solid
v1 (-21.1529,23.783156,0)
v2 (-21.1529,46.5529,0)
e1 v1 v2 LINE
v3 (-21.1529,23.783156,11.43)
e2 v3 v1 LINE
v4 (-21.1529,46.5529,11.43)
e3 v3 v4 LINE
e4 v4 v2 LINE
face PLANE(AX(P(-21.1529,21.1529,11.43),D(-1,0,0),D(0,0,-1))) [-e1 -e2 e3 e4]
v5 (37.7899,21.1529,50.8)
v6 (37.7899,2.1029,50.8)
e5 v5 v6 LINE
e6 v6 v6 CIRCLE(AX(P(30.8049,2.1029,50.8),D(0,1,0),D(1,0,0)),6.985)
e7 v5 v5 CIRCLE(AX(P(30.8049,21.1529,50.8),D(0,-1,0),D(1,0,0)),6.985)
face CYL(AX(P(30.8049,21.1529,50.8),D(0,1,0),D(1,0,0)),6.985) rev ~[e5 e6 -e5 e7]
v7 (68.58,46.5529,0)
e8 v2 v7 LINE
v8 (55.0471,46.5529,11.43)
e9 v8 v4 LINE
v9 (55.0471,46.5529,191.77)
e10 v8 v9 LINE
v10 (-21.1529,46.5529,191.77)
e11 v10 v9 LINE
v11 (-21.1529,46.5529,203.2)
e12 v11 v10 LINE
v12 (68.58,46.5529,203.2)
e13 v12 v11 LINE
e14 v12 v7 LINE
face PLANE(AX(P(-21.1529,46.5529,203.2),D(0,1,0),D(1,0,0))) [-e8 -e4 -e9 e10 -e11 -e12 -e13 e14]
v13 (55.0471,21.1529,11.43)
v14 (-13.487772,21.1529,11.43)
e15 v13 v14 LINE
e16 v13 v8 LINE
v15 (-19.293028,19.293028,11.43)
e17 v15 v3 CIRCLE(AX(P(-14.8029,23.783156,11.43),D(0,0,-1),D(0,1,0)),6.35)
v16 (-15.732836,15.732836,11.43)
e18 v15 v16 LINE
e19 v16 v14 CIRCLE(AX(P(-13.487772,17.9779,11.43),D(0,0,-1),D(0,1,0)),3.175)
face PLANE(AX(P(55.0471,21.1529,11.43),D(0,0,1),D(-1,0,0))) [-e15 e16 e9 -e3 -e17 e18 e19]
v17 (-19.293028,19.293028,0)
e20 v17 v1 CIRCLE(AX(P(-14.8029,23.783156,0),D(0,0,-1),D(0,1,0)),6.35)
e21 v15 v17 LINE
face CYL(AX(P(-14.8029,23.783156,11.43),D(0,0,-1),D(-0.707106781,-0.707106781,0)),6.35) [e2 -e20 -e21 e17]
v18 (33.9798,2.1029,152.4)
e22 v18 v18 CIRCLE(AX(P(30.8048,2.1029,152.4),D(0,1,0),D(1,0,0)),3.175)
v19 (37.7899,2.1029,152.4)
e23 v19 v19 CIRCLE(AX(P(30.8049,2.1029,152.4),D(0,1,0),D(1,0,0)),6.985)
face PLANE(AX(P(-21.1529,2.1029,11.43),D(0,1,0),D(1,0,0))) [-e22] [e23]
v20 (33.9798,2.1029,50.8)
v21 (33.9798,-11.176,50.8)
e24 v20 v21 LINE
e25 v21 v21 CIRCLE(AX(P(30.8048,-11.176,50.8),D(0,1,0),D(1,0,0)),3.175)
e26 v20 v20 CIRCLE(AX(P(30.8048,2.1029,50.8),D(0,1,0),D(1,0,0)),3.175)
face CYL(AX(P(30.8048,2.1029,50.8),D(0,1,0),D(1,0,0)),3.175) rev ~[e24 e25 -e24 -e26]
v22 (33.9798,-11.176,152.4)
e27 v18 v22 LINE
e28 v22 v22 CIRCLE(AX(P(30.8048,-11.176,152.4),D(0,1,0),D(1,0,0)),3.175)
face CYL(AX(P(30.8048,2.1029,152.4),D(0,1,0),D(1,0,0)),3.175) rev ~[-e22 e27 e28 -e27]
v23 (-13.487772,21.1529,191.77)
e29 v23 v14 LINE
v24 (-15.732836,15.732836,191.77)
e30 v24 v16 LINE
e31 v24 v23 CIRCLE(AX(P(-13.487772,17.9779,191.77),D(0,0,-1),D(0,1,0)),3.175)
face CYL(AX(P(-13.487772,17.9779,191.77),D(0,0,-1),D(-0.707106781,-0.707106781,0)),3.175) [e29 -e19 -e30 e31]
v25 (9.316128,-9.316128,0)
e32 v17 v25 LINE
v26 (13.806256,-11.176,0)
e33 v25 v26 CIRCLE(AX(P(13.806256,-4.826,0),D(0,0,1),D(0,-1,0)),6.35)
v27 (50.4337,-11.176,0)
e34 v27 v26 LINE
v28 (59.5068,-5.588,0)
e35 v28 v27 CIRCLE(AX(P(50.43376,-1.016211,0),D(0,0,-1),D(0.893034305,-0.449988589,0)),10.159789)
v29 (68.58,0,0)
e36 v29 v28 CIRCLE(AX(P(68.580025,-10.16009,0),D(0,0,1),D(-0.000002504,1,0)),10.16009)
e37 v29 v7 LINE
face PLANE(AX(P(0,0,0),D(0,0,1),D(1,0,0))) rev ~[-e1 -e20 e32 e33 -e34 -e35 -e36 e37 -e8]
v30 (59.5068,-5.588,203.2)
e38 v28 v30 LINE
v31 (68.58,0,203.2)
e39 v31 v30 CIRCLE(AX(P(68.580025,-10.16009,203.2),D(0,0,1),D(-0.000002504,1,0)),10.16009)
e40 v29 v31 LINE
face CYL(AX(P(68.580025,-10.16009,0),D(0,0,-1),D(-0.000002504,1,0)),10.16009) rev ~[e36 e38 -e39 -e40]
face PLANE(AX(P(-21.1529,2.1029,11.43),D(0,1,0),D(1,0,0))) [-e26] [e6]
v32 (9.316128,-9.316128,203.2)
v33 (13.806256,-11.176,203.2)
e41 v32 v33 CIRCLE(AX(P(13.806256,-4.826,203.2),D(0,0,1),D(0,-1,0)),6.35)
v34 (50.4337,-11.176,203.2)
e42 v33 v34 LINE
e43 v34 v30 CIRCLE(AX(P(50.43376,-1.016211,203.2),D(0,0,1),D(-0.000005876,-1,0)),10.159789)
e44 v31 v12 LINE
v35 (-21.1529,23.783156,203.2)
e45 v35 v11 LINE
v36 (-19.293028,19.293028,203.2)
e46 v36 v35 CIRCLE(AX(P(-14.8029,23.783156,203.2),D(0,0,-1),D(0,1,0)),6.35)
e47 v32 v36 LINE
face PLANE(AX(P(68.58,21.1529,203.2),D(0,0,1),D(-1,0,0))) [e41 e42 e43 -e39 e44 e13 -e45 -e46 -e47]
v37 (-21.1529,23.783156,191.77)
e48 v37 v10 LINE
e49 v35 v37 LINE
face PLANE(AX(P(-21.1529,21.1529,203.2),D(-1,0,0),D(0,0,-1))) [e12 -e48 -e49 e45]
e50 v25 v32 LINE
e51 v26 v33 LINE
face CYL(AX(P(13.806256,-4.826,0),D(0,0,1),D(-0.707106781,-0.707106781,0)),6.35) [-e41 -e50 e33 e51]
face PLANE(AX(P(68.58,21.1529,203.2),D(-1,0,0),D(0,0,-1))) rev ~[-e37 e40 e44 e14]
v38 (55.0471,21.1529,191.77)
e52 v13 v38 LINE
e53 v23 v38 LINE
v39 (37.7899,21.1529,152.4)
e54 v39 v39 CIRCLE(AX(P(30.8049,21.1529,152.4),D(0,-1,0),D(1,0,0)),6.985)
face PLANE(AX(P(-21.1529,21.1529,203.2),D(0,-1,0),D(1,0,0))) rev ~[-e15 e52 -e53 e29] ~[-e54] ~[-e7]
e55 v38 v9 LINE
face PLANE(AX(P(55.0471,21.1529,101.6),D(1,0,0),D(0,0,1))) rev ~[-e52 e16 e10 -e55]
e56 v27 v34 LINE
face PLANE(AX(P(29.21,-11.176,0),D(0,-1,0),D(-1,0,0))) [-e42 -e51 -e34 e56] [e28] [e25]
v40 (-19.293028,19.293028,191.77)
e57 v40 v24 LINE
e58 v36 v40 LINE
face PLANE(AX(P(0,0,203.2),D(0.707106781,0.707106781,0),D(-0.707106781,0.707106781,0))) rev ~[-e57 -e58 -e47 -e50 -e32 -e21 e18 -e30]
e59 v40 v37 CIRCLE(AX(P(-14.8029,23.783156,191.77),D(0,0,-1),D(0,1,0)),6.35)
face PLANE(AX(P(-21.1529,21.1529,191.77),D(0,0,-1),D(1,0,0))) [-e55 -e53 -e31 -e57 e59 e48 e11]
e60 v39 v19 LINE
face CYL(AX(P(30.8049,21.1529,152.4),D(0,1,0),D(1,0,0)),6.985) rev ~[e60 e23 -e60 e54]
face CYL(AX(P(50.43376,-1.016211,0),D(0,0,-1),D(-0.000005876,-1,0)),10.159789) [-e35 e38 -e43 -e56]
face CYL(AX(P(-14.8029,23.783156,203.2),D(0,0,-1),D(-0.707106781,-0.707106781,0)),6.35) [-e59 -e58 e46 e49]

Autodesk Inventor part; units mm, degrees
ref_plane "YZ Plane" through (0, 0, 0) normal (1, 0, 0) x (0, 1, 0)
ref_plane "XZ Plane" through (0, 0, 0) normal (0, 1, 0) x (-1, 0, 0)
ref_plane "XY Plane" through (0, 0, 0) normal (0, 0, 1) x (1, 0, 0)
sketch "Sketch1" plane through (0, 0, 0) normal (0, 0, 1) x (1, 0, 0)
  line L0 (0, 0) -> (58.42, 0)
  line L1 (29.21, 0) -> (29.21, -11.176)
  line L2 (0, 0) -> (29.21, 0)
  line L3 (29.21, 0) -> (29.21, -11.176)
  line L4 (29.21, -11.176) -> (0, -11.176)
  line L5 (0, -11.176) -> (0, 0)
  line L6 (0, -11.176) -> (11.176, -11.176)
  line L7 (11.176, -11.176) -> (0, 0)
  line L8 (59.055, 0) -> (29.21, 0)
  line L9 (29.21, 0) -> (29.21, -11.176)
  line L10 (58.42, 0) -> (29.21, 0)
  line L11 (29.21, 0) -> (29.21, -11.176)
  line L12 (29.21, -11.176) -> (50.4337, -11.176)
  line L13 (58.42, -11.176) -> (58.42, -10.16)
  line L14 (58.42, -11.176) -> (90.1357, -11.176)
  line L15 (90.1357, -11.176) -> (90.1357, 0)
  line L16 (90.1357, 0) -> (68.58, 0)
  line L17 (58.42, 0) -> (58.42, -11.176)
  arc A0 (68.58, 0) -> (59.5068, -5.588) centre (68.58, -10.16) ccw
  arc A1 (50.4337, -11.176) -> (59.5068, -5.588) centre (50.4337, -1.016) ccw
  line L18 (58.42, 0) -> (68.58, 0)
  point P0 (58.42, -7.2964)
  dimension "d1" = 11.176
  dimension "d2" = 11.176
  dimension "d3" = 10.16
  dimension "d6" = 68.58
  dimension "d7" = 10.16
extrude "Extrusion1" add sketch "Sketch1" along normal blind 203.2 contours L0 L1 L4 L7 | L0 L17 A1 L12 L1 | L8 L18 A0 A1 L17
sketch "Sketch2" plane through (0, 0, 203.2) normal (0, 0, 1) x (1, 0, 0)
  line L0 (11.176, -11.176) -> (50.4337, -11.176) projected
  line L1 (11.176, -11.176) -> (-21.1529, 21.1529)
  line L2 (0, 0) -> (11.176, -11.176) projected
  line L3 (-21.1529, 21.1529) -> (68.58, 21.1529)
  arc A0 (68.58, 0) -> (59.5068, -5.588) centre (68.58, -10.16) ccw projected
  line L4 (68.58, 21.1529) -> (68.58, 0)
  arc A1 (57.404, 8.0148) -> (49.5263, -0.5588) centre (68.58, -10.16) ccw
  line L5 (57.404, 8.0148) -> (57.404, 9.9769)
  line L6 (5.8283, 9.9769) -> (19.0786, -3.2734)
  line L7 (31.6162, 9.9769) -> (31.6162, 0)
  line L8 (68.58, 0) -> (0, 0) projected
  line L9 (26.0282, 9.9769) -> (26.0282, 0)
  line L10 (37.2042, 9.9769) -> (37.2042, 0)
  point P0 (15.8053, 0)
  point P1 (26.0282, 0)
  point P2 (37.2042, 0)
  point P3 (49.8184, 0)
  dimension "d9" = 45.72
  dimension "d11" = 5.588
  dimension "d12" = 5.588
extrude "Extrusion2" add sketch "Sketch2" against normal blind 203.2
sketch "Sketch3" plane through (-21.1529, 21.1529, 203.2) normal (0, 1, 0) x (1, 0, 0)
  line L0 (0, 0) -> (0, 203.2) projected
  line L1 (0, 101.6) -> (76.2, 101.6)
  line L2 (76.2, 101.6) -> (76.2, 191.77)
  line L3 (76.2, 191.77) -> (76.2, 11.43)
  line L4 (76.2, 191.77) -> (0, 191.77)
  line L5 (0, 191.77) -> (0, 11.43)
  line L6 (0, 11.43) -> (76.2, 11.43)
  line L7 (76.2, 11.43) -> (76.2, 191.77)
  line L8 (89.7329, 0) -> (0, 0) projected
  line L9 (89.7329, 0) -> (89.7329, 203.2) projected
  line L10 (0, 203.2) -> (89.7329, 203.2) projected
  line L11 (0, 0) -> (0, 203.2) projected
  point P0 (21.1529, 203.2)
  dimension "d15" = 76.2
  dimension "d16" = 90.17
  dimension "d17" = 180.34
extrude "Extrusion3" add sketch "Sketch3" along normal blind 25.4 contours L0 L6 L3 L2 L4 L10 L9 L8
sketch "Sketch4" plane through (-21.1529, 21.1529, 11.43) normal (0, 1, 0) x (1, 0, 0)
  line L0 (32.3289, 11.43) -> (71.5866, 11.43) projected
  line L1 (71.5866, 11.43) -> (71.5866, -191.77) projected
  line L2 (32.3289, -191.77) -> (71.5866, -191.77) projected
  line L3 (32.3289, 11.43) -> (32.3289, -191.77) projected
  line L4 (32.3289, -90.17) -> (71.5866, -90.17)
  line L5 (51.9578, -90.17) -> (51.9578, 11.43)
  line L6 (51.9578, -90.17) -> (51.9578, -191.77)
  circle A0 centre (51.9578, -140.97) radius 6.985
  circle A1 centre (51.9578, -39.37) radius 6.985
  point P0 (21.1529, 11.43)
  dimension "d20" = 13.97
  dimension "d21" = 13.97
extrude "Extrusion4" cut sketch "Sketch4" against normal blind 19.05 contours A1 L5 | L5 A1 | A0 L6 | L6 A0
fillet "Fillet1" radius 3.175 1 edges at (-21.1529, 21.1529, 101.6)
fillet "Fillet2" radius 6.35 2 edges at (-21.1529, 21.1529, 5.715) (-21.1529, 21.1529, 197.485)
fillet "Fillet3" radius 6.35 1 edges at (11.176, -11.176, 101.6)
sketch "Sketch5" plane through (30.8048, 2.1029, 152.4) normal (0, 1, 0) x (1, 0, 0)
  line L0 (-21.4887, -50.8) -> (-21.4887, 152.4) projected
  line L1 (-44.2926, -39.37) -> (-44.2926, 140.97) projected
  line L2 (-44.2926, -39.37) -> (24.2422, -39.37) projected
  line L3 (24.2422, -39.37) -> (24.2422, 140.97) projected
  line L4 (24.2422, 140.97) -> (-44.2926, 140.97) projected
  circle A0 centre (0, 0) radius 6.985 projected
  circle A1 centre (0, 101.6) radius 6.985 projected
  circle A2 centre (0, 101.6) radius 3.175
  circle A3 centre (0, 0) radius 3.175
  point P0 (-30.8048, 152.4)
  dimension "d27" = 6.35
  dimension "d28" = 6.35
extrude "Extrusion5" cut sketch "Sketch5" against normal blind 25.4 contours A2 | A3
properties part number "Battery mount bottom" material "Rubber, Silicone"
